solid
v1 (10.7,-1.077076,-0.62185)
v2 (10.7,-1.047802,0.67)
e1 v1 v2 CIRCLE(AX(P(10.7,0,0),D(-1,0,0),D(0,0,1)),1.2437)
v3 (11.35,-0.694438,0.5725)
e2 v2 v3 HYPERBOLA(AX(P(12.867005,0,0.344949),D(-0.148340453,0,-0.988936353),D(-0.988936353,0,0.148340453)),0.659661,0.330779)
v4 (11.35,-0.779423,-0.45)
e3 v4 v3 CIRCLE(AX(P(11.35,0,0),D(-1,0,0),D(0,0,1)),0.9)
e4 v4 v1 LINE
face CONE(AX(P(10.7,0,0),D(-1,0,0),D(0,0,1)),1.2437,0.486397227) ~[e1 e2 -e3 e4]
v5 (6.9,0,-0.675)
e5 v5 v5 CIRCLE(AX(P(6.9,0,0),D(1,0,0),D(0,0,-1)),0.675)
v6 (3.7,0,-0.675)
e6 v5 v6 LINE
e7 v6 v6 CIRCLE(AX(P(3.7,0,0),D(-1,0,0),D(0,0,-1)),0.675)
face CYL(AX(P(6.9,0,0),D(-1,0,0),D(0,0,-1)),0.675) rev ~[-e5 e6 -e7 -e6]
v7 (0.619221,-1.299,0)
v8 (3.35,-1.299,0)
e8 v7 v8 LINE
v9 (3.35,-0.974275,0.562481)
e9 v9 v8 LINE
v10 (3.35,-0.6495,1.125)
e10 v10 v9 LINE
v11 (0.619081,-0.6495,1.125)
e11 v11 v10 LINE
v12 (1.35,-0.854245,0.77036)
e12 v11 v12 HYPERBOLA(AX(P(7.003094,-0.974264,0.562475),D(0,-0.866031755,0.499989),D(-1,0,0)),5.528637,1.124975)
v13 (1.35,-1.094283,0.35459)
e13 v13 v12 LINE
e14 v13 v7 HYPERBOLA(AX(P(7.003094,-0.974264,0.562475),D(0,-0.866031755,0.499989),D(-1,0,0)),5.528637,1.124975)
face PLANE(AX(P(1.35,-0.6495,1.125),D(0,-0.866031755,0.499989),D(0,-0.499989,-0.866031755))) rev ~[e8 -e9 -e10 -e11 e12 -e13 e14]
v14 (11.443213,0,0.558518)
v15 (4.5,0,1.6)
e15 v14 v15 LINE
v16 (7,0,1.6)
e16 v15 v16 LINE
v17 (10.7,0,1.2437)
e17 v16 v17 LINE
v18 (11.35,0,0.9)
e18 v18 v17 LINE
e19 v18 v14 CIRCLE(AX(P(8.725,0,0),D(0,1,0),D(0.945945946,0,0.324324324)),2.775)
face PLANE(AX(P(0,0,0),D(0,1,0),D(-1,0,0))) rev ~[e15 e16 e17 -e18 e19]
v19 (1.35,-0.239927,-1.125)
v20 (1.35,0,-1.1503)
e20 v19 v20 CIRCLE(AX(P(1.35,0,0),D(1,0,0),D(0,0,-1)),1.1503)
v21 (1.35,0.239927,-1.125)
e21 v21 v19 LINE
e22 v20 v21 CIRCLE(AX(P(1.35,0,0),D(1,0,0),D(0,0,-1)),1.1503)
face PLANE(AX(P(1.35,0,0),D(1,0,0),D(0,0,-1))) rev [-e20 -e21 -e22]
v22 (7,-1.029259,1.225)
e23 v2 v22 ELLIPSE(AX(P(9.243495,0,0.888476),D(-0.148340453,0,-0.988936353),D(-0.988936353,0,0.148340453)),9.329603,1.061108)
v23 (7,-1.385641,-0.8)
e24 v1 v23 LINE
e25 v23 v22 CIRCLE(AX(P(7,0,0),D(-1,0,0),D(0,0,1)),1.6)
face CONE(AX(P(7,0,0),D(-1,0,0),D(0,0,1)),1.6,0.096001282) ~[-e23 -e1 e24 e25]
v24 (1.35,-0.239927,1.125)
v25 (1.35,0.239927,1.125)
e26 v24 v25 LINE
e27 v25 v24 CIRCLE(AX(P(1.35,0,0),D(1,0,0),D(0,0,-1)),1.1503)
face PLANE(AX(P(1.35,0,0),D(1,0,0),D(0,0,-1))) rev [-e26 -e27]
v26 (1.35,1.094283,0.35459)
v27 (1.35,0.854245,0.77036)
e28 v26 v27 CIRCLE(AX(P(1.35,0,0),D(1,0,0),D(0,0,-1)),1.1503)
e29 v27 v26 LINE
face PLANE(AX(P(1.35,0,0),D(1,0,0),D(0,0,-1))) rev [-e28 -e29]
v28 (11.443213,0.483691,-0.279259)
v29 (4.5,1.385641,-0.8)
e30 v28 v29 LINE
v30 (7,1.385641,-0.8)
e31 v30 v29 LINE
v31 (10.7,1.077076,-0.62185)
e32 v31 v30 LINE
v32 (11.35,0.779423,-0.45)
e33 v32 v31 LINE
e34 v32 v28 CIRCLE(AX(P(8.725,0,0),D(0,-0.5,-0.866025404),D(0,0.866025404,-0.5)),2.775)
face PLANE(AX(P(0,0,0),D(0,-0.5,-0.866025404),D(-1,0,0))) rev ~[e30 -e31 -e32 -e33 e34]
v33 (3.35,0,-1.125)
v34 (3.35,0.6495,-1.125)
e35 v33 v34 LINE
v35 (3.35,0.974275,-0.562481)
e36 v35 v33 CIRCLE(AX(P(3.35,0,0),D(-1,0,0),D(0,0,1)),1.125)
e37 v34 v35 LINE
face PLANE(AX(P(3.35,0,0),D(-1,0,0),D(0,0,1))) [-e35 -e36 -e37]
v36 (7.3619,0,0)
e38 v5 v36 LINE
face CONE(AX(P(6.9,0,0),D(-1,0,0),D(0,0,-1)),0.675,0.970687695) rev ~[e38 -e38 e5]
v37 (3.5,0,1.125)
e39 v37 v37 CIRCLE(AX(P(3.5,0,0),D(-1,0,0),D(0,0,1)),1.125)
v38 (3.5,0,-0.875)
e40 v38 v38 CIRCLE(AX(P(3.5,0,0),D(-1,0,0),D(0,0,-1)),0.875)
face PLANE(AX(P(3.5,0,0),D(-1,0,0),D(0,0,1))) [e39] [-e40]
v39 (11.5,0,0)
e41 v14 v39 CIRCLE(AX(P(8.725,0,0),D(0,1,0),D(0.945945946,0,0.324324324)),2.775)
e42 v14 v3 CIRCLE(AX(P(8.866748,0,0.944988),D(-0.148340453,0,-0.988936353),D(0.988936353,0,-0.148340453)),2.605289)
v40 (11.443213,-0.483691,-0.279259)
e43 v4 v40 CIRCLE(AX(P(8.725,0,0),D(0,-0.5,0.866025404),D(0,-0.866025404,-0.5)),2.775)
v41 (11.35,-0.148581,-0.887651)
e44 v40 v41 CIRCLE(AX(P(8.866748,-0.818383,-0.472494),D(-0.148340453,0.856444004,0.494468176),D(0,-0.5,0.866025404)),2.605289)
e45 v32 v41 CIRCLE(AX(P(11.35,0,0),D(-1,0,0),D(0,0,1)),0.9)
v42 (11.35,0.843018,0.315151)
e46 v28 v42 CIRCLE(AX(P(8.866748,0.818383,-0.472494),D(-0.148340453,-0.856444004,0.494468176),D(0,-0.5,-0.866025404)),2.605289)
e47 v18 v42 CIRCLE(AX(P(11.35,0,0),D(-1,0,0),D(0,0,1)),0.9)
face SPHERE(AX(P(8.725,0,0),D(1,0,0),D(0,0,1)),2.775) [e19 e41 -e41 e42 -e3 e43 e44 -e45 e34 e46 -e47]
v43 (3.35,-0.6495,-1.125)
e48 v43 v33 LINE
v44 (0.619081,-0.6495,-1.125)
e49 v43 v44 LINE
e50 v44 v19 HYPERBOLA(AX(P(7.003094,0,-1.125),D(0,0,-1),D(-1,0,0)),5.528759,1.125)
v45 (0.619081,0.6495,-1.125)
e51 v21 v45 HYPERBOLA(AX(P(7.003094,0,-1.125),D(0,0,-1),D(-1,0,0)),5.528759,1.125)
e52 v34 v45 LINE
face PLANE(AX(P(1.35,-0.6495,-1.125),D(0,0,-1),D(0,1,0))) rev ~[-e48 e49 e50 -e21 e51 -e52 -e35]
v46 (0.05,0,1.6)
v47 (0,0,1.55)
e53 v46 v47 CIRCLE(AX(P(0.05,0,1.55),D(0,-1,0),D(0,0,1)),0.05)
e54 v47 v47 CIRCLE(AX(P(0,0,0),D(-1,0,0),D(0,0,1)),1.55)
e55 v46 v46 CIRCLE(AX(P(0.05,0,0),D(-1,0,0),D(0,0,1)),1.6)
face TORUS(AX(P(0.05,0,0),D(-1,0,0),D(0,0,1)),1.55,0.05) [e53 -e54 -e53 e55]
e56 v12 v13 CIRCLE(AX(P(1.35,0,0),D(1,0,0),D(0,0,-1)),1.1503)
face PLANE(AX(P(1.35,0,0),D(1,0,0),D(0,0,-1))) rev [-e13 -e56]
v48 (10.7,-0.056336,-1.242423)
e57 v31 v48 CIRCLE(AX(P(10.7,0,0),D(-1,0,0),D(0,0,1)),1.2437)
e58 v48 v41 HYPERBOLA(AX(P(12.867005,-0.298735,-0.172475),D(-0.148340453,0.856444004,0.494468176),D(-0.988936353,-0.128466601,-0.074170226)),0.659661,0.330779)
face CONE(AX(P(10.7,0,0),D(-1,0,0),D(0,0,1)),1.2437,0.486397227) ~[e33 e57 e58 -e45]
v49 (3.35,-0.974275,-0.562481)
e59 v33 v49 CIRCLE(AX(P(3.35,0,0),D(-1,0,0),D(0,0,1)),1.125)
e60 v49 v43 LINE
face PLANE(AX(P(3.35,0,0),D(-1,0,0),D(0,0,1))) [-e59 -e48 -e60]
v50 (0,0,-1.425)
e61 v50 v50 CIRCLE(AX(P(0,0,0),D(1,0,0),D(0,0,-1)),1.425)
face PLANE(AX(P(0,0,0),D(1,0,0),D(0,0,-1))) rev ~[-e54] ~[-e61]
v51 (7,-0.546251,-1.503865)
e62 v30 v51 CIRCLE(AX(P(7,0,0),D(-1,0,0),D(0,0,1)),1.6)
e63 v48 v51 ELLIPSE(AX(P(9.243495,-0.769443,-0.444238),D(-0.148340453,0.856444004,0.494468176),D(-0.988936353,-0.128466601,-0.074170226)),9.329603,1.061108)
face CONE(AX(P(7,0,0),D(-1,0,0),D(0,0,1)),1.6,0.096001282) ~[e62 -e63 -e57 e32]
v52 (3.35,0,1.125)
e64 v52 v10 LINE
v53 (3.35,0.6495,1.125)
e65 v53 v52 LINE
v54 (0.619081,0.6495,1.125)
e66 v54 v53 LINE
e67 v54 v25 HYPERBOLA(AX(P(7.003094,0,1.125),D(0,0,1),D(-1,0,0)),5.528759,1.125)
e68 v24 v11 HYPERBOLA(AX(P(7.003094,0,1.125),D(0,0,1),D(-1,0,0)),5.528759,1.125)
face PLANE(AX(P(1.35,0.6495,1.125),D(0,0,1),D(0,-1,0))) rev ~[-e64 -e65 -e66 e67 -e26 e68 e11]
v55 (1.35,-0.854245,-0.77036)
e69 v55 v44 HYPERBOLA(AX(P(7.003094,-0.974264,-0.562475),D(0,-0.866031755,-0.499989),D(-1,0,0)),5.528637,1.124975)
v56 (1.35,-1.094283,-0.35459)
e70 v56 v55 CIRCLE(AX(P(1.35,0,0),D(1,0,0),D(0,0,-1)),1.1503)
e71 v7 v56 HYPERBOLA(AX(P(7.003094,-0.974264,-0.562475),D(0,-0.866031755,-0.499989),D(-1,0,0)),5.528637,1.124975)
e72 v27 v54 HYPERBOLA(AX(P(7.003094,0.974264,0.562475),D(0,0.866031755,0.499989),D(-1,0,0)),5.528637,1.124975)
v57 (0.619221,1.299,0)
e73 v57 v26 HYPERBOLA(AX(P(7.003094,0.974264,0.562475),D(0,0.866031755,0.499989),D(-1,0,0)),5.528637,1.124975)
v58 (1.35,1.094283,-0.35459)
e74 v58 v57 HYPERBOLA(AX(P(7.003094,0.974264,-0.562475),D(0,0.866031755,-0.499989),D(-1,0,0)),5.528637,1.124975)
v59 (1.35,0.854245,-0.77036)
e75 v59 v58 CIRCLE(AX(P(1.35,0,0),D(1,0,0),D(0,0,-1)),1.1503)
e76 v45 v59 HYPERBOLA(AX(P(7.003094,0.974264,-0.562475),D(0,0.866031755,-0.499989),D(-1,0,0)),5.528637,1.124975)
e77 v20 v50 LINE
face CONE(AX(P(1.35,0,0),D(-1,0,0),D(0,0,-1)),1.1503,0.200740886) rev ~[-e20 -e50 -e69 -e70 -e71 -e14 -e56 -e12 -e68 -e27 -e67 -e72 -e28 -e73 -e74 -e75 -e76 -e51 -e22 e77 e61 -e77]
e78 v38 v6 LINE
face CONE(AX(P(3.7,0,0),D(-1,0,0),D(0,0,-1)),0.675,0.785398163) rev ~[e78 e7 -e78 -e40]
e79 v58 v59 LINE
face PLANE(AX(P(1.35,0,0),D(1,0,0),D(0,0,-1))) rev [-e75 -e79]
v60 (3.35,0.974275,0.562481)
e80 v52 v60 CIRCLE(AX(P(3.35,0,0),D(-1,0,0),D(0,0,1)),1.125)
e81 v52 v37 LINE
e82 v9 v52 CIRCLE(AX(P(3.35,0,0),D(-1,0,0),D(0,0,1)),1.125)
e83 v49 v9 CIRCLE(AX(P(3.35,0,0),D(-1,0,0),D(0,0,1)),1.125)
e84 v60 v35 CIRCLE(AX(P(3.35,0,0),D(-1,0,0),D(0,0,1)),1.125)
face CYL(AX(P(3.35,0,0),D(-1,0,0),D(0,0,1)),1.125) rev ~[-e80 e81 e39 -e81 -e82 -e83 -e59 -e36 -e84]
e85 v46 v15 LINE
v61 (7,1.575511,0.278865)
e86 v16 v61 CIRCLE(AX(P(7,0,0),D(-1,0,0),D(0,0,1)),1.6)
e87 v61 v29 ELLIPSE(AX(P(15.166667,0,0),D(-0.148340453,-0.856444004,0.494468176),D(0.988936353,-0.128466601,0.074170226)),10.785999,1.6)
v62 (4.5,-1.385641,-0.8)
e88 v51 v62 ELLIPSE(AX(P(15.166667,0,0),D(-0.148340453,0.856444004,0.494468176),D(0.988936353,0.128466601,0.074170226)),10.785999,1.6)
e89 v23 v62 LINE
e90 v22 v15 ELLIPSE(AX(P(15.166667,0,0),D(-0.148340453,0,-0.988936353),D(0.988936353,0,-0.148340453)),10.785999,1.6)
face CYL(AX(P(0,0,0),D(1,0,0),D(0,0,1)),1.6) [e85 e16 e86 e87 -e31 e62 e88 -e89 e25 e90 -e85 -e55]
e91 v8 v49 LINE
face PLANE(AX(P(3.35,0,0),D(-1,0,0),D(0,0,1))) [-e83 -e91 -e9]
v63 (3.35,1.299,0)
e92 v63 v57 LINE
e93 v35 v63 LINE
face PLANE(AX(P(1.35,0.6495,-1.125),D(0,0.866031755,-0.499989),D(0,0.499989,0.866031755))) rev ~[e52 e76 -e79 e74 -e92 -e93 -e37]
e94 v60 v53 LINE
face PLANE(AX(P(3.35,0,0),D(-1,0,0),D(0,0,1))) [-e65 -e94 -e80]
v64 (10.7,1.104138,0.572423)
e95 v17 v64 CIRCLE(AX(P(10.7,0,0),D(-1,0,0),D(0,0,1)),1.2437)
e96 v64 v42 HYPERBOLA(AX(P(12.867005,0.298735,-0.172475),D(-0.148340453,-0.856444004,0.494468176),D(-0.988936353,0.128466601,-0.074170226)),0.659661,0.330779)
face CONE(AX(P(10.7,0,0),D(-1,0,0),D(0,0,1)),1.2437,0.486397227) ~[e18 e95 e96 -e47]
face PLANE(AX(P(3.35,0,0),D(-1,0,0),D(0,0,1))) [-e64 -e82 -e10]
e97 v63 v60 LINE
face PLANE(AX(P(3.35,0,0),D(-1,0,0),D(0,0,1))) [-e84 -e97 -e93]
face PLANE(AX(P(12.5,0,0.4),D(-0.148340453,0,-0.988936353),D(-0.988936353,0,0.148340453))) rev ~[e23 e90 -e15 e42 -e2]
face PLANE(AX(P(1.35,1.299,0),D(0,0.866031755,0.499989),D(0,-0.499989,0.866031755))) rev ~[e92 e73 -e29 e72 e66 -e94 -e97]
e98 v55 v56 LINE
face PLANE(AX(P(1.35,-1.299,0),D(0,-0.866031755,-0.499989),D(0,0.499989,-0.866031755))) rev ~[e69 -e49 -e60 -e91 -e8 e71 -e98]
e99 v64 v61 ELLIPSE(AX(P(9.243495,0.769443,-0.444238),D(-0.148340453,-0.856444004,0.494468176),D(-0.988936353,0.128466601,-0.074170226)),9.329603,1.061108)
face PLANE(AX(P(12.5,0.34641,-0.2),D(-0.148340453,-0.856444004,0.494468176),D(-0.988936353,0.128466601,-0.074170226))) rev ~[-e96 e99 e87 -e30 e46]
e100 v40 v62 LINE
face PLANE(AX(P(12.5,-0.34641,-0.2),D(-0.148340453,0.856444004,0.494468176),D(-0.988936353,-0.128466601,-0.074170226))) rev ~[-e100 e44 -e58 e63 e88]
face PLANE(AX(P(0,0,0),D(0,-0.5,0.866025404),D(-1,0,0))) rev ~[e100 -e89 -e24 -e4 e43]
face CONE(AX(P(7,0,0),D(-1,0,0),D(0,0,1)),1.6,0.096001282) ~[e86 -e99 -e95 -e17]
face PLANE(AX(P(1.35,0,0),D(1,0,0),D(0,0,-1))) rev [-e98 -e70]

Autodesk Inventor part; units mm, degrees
ref_plane "YZ Plane" through (0, 0, 0) normal (1, 0, 0) x (0, 1, 0)
ref_plane "XZ Plane" through (0, 0, 0) normal (0, 1, 0) x (-1, 0, 0)
ref_plane "XY Plane" through (0, 0, 0) normal (0, 0, 1) x (1, 0, 0)
sketch "Sketch1" plane through (0, 0, 0) normal (0, 1, 0) x (-1, 0, 0)
  line L0 (0, 0) -> (0, 1.6)
  line L1 (0, 1.6) -> (-7, 1.6)
  line L2 (-7, 1.6) -> (-10.7, 1.2437)
  line L3 (-11.2, 0.9793) -> (-11.2, 0)
  line L4 (-11.2, 0) -> (0, 0)
  arc A0 (-11.35, 0.9) -> (-11.5, 0) centre (-8.725, 0) ccw
  line L5 (-11.2, 0) -> (-11.5, 0)
  line L6 (-10.7, 0) -> (-10.7, 1.2437)
  line L7 (-10.7, 1.2437) -> (-11.35, 0.9)
  dimension "d0" = 1.6
  dimension "d1" = 7
  dimension "d3" = 11.2
  dimension "d4" = 0.3
  dimension "d352" = 0.8
  dimension "d353" = 0.9
  dimension "d355" = 0.65
  dimension "d359" = 5.5
revolve "Revolution1" add sketch "Sketch1" angle 360 about axis through (11.2, 0, 0) along (-1, 0, 0)
sketch "Sketch2" plane through (0, 0, 0) normal (0, 1, 0) x (-1, 0, 0)
  line L0 (0, -1.425) -> (0, 0)
  line L1 (0, 0) -> (-6.9, 0)
  line L2 (-6.9, 0) -> (-6.9, -0.675)
  line L3 (-6.9, -0.675) -> (-2.8, -0.675)
  line L4 (-2.8, -0.675) -> (-2.8, -1.1)
  line L5 (-2.8, -1.1) -> (-1.35, -1.1)
  line L6 (-1.35, -1.1) -> (-1.35, -1.1503)
  line L7 (-1.35, -1.1503) -> (0, -1.425)
  line L8 (-6.9, -0.675) -> (-7.3619, 0)
  line L9 (-7.3619, 0) -> (-6.9, 0) construction
  line L10 (-7.3619, 0) -> (-6.9, 0)
  line L11 (0, 0) -> (0, -1.425)
  line L12 (0, -1.6) -> (0, 1.6) projected
  line L13 (0, -1.425) -> (0, -1.425)
  dimension "d9" = 1.1
  dimension "d11" = 1.425
  dimension "d12" = 11.5
  dimension "d145" = 0.4619
  dimension "d284" = 1.45
  dimension "d293" = 1.35
  dimension "d361" = 1.425
  dimension "d363" = 0
  dimension "d367" = 6.9
  dimension "d373" = 0.675
revolve "Revolution2" cut sketch "Sketch2" angle 360 about axis through (0, 0, 0) along (1, 0, 0)
sketch "Sketch3" plane through (1.35, 0, 0) normal (-1, 0, 0) x (0, 0, 1)
  line L0 (0, 1.299) -> (1.125, 0.6495)
  line L1 (1.125, 0.6495) -> (1.125, -0.6495)
  line L2 (1.125, -0.6495) -> (0, -1.299)
  line L3 (0, -1.299) -> (-1.125, -0.6495)
  line L4 (-1.125, -0.6495) -> (-1.125, 0.6495)
  line L5 (-1.125, 0.6495) -> (0, 1.299)
  point P0 (0, 0)
  point P1 (0, 0)
  dimension "d20" = 0
  dimension "d21" = 2.25
extrude "Extrusion1" cut sketch "Sketch3" along normal blind 1.25 and the other way blind 2
fillet "Fillet1" radius 0.05 1 edges at (0, 0, -1.6)
sketch "Sketch10" plane through (0, 0, 0) normal (0, 1, 0) x (-1, 0, 0)
  circle A0 centre (-1.8, 1.5) radius 0.1
  line L0 (-0.5216, -1.4433) -> (-0.46, -1.55)
  line L1 (-0.46, -1.55) -> (-0.6332, -1.55)
  line L2 (-0.6332, -1.55) -> (-0.5716, -1.4433)
  line L3 (-0.5216, -1.4433) -> (-0.5716, -1.4433)
  line L4 (0, 1.55) -> (0, -1.55) projected
  point P0 (0, 0)
  point P1 (-0.5466, -1.5)
  point P2 (-0.5466, -1.4)
  dimension "d69" = 0.2
  dimension "d70" = 1.5
  dimension "d71" = 1.8
  dimension "d232" = 0.15
  dimension "d233" = 0.05
  dimension "d234" = 0.05
  dimension "d235" = 0.46
  dimension "d236" = 1.55
  dimension "d237" = 1.55
sketch "Sketch24" plane through (0, 0, 0) normal (0, 1, 0) x (-1, 0, 0)
  line L0 (-2.0692, 1.4443) -> (-2.5292, 1.4)
  line L1 (-2.5292, 1.4) -> (-3.1116, 2.2165)
  line L2 (-3.1116, 2.2165) -> (-2, 2.3235)
  line L3 (-2, 2.3235) -> (-2.0692, 1.4443)
  line L4 (-0.6191, 1.125) -> (-3.35, 1.125) projected
  line L5 (0, 1.425) -> (0, -1.425) projected
  point P0 (0, 0)
  point P1 (-2.6, -1.125)
  point P2 (-0.2505, -1.125)
  dimension "d167" = 60
  dimension "d170" = 2
  dimension "d171" = 100
  dimension "d357" = 0.8685
  dimension "d358" = 0.46
  dimension "d370" = 1.4
  dimension "d371" = 84.5
coil "Coil12" [suppressed]
coil "Coil16" [suppressed]
sketch "Sketch41" plane through (2.0889, 1.4266, -0.4635) normal (0, -0.309017, -0.9510565) x (1, 0, 0)
  line L0 (0.1155, 0) -> (0.0827, 0.0567) projected
  line L1 (0.0827, 0.0567) -> (0.0327, 0.0567) projected
  line L2 (-0.4173, 0.0567) -> (-0.4673, 0.0567) projected
  line L3 (-0.9173, 0.0567) -> (-0.9673, 0.0567) projected
  line L4 (-1.4173, 0.0567) -> (-1.4673, 0.0567) projected
  line L5 (-1.2173, 2.9433) -> (-1.1673, 2.9433) projected
  line L6 (-0.7173, 2.9433) -> (-0.6673, 2.9433) projected
  line L7 (-0.2173, 2.9433) -> (-0.1673, 2.9433) projected
  arc A0 (-2.0889, 0.05) -> (-2.0389, 0) centre (-2.0389, 0.05) ccw projected
  line L8 (-2.0889, 0.05) -> (-2.0889, 0.15) projected
  line L9 (-2.0889, 0.15) -> (-1.1065, 0.3499) projected
  line L10 (4.8111, 0.7) -> (5.273, 1.5) projected
  line L11 (5.273, 1.5) -> (4.8111, 2.3) projected
  line L12 (-1.1065, 2.6501) -> (-2.0889, 2.85) projected
  line L13 (-2.0889, 2.85) -> (-2.0889, 2.95) projected
  arc A1 (-2.0389, 3) -> (-2.0889, 2.95) centre (-2.0389, 2.95) ccw projected
  line L14 (4.8111, 2.3) -> (0.7111, 2.3) projected
  line L15 (0.7111, 0.7) -> (4.8111, 0.7) projected
  line L16 (0.7111, 2.3) -> (0.7111, 2.6) projected
  line L17 (0.5111, 0.4) -> (0.7111, 0.4) projected
  line L18 (0.7111, 2.6) -> (0.5111, 2.6) projected
  line L19 (0.7111, 0.4) -> (0.7111, 0.7) projected
  line L20 (0, 0) -> (-0.3845, 0) projected
  line L21 (0.0327, 0.0567) -> (0, 0) projected
  line L22 (0.1155, 0) -> (0, 0) projected
  line L23 (0.5111, 0.3499) -> (0.5111, 0.4) projected
  line L24 (0.5111, 2.6) -> (0.5111, 2.6501) projected
  arc A2 (9.2611, 0.6) -> (9.2611, 2.4) centre (6.6361, 1.5) ccw projected
  line L25 (0.5111, 2.6501) -> (-1.1065, 2.6501) projected
  line L26 (4.9111, 0) -> (0.1155, 0) projected
  line L27 (-1.1065, 0.3499) -> (0.5111, 0.3499) projected
  line L28 (9.2611, 0.6) -> (8.6111, 0.3237) projected
  line L29 (8.6111, 0.3237) -> (4.9111, 0) projected
  line L30 (-0.5, 0) -> (-0.8845, 0) projected
  line L31 (-1, 0) -> (-1.3845, 0) projected
  line L32 (-1.5, 0) -> (-2.0389, 0) projected
  line L33 (-2.0389, 3) -> (-1.25, 3) projected
  line L34 (-1.1345, 3) -> (-0.75, 3) projected
  line L35 (-0.6345, 3) -> (-0.25, 3) projected
  line L36 (-0.1345, 3) -> (4.9111, 3) projected
  line L37 (4.9111, 3) -> (8.6111, 2.6763) projected
  line L38 (8.6111, 2.6763) -> (9.2611, 2.4) projected
  point P0 (-2.0889, 1.5)
  point P1 (0.04, 2.55)
  point P2 (0.04, 0.95)
  point P3 (2.4363, -2.336)
  point P4 (2.2646, -2.336)
  point P5 (1.6424, -2.336)
  point P6 (1.4156, -2.336)
  point P7 (0.8485, -2.336)
  point P8 (0.5666, -2.336)
  point P9 (0.14, 0.3317)
  point P10 (0.14, 2.6683)
  point P11 (-0.69, 0)
  point P12 (-0.5168, 0)
  point P13 (-1.15, 0)
  point P14 (0.0554, 3.4951)
  point P15 (0.4369, 3.5)
  point P16 (5.5075, 3.4591)
  point P17 (9.4087, 0.8232)
  point P18 (9.1185, 0.3568)
  point P19 (9.1075, 0.3559)
  point P20 (8.3185, 0.2868)
  point P21 (8.3075, 0.2859)
  point P22 (7.5185, 0.2168)
  point P23 (7.5075, 0.2159)
  point P24 (6.7185, 0.1469)
  point P25 (6.7075, 0.1459)
  point P26 (5.9185, 0.0769)
  point P27 (5.9075, 0.0759)
  point P28 (5.1185, 0.0069)
  point P29 (5.1075, 0.0059)
  point P30 (0, 0.0001)
  point P31 (10.24, 3.1065)
  point P32 (9.9229, 0.3686)
  point P33 (9.8272, 0.361)
  point P34 (9.1222, 0.3055)
  point P35 (9.0317, 0.2984)
  point P36 (8.3215, 0.2425)
  point P37 (8.2362, 0.2358)
  point P38 (7.5207, 0.1795)
  point P39 (7.4407, 0.1732)
  point P40 (6.72, 0.1165)
  point P41 (6.6452, 0.1106)
  point P42 (5.9192, 0.0535)
  point P43 (5.8497, 0.048)
  point P44 (5.1195, 0)
  point P45 (5.0443, 0)
  point P46 (4.2066, 0)
  point P47 (3.5312, 0)
  point P48 (3.3689, 0)
  point P49 (2.7371, 0)
  point P50 (2.5311, 0)
  point P51 (1.943, 0)
  point P52 (1.6934, 0)
  point P53 (1.1489, 0)
  point P54 (0.8557, 0)
  point P55 (10.3292, 3.0438)
  point P56 (10.225, 3.1077)
  point P57 (9.5226, 3.163)
  point P58 (9.4295, 3.1703)
  point P59 (8.7218, 3.226)
  point P60 (8.634, 3.2329)
  point P61 (7.9211, 3.289)
  point P62 (7.8385, 3.2955)
  point P63 (7.1203, 3.352)
  point P64 (7.043, 3.3581)
  point P65 (6.3196, 3.415)
  point P66 (6.2475, 3.4207)
  point P67 (5.5189, 3.4781)
  point P68 (5.4519, 3.4833)
  point P69 (4.7224, 3.5)
  point P70 (4.6255, 3.5)
  point P71 (3.9283, 3.5)
  point P72 (3.7877, 3.5)
  point P73 (3.1342, 3.5)
  point P74 (2.95, 3.5)
  point P75 (2.3401, 3.5)
  point P76 (2.1123, 3.5)
  point P77 (1.5459, 3.5)
  point P78 (1.2745, 3.5)
  point P79 (0.7518, 3.5)
  point P80 (0.4368, 3.5)
  point P81 (0.0559, 3.4961)
  point P82 (-0.0003, 0)
  point P83 (1.2685, 3)
  point P84 (0.6925, 3)
  point P85 (2.1062, 3)
  point P86 (2.9439, 3)
  point P87 (1.4866, 3)
  point P88 (3.7817, 3)
  point P89 (2.2807, 3)
  point P90 (3.0748, 3)
  point P91 (4.6194, 3)
  point P92 (3.8689, 3)
  point P93 (4.6631, 3)
  point P94 (9.3294, 0.7244)
  point P95 (8.9446, 0.4186)
  point P96 (5.4339, 2.9655)
  point P97 (5.461, 2.9636)
  point P98 (6.2339, 2.9095)
  point P99 (6.261, 2.9076)
  point P100 (7.0339, 2.8536)
  point P101 (7.061, 2.8517)
  point P102 (7.8339, 2.7976)
  point P103 (7.861, 2.7957)
  point P104 (8.6339, 2.7417)
  point P105 (8.261, 0.2322)
  point P106 (7.461, 0.1763)
  point P107 (8.2339, 0.2303)
  point P108 (6.661, 0.1203)
  point P109 (7.4339, 0.1744)
  point P110 (5.861, 0.0644)
  point P111 (6.6339, 0.1184)
  point P112 (5.061, 0.0085)
  point P113 (5.8339, 0.0625)
  point P114 (9.0823, 0.491)
  point P115 (-0.7468, 0)
  point P116 (5.0339, 0.0066)
  point P117 (-1.2068, 0)
  point P118 (0.1351, 3)
  point P119 (0.9307, 3)
  point P120 (0.6796, 3)
  point P121 (1.5195, 3)
  point P122 (1.7263, 3)
  point P123 (2.3594, 3)
  point P124 (2.5219, 3)
  point P125 (3.1993, 3)
  point P126 (3.3175, 3)
  point P127 (4.0392, 3)
  point P128 (4.113, 3)
  point P129 (5.6716, 2.9335)
  point P130 (5.7097, 2.9301)
  point P131 (6.4622, 2.8643)
  point P132 (6.5109, 2.86)
  point P133 (7.2527, 2.7951)
  point P134 (7.312, 2.79)
  point P135 (8.0433, 2.726)
  point P136 (8.1131, 2.7199)
  point P137 (8.7927, 2.5991)
  point P138 (8.9225, 2.5439)
  point P139 (9.115, 0.5379)
  point P140 (8.5136, 0.3152)
  point P141 (8.4386, 0.3086)
  point P142 (7.7125, 0.2451)
  point P143 (7.648, 0.2394)
  point P144 (6.9114, 0.175)
  point P145 (6.8574, 0.1703)
  point P146 (6.1103, 0.1049)
  point P147 (6.0669, 0.1011)
  point P148 (5.3092, 0.0348)
  point P149 (5.2763, 0.0319)
  point P150 (4.9086, 3)
  point P151 (4.8791, 3)
extrude "Extrusion19" [suppressed]
sketch "Sketch45" plane through (0, 0, 0) normal (0, 1, 0) x (-1, 0, 0)
  point P0 (0, 0)
sketch "Sketch47" plane through (0, 0, 0) normal (0, 0, 1) x (1, 0, 0)
  line L0 (0, -1.425) -> (0.6191, -1.299) projected
  line L1 (6.9, -0.675) -> (7.3619, 0) projected
  line L2 (7.3619, 0) -> (6.9, 0.675) projected
  line L3 (0.6191, 1.299) -> (0, 1.425) projected
  line L4 (6.9, 0.675) -> (3.35, 0.675) projected
  line L5 (3.35, -0.675) -> (6.9, -0.675) projected
  arc A0 (0, -1.55) -> (0.05, -1.6) centre (0.05, -1.55) ccw projected
  line L6 (0, -1.55) -> (0, -1.425) projected
  line L7 (0, 1.425) -> (0, 1.55) projected
  arc A1 (0.05, 1.6) -> (0, 1.55) centre (0.05, 1.55) ccw projected
  line L8 (10.7, 1.2437) -> (11.35, 0.9) projected
  arc A2 (11.35, -0.9) -> (11.35, 0.9) centre (8.725, 0) ccw projected
  line L9 (11.35, -0.9) -> (10.7, -1.2437) projected
  line L10 (10.7, -1.2437) -> (7, -1.6) projected
  line L11 (7, -1.6) -> (0.05, -1.6) projected
  line L12 (0.05, 1.6) -> (7, 1.6) projected
  line L13 (7, 1.6) -> (10.7, 1.2437) projected
  line L14 (0.6191, -1.299) -> (3.35, -1.299) projected
  line L15 (3.35, -1.299) -> (3.35, -0.675) projected
  line L16 (3.35, 0.675) -> (3.35, 1.299) projected
  line L17 (3.35, 1.299) -> (0.6191, 1.299) projected
  point P0 (0, 0)
  point P1 (7.012, 0)
sketch "Sketch9" plane through (0, 0, 0) normal (0, 1, 0) x (-1, 0, 0)
  line L0 (0, 1.425) -> (0, -1.425) projected
  line L1 (0, -1.6) -> (0, 1.6) projected
  line L2 (-12.5, 1.6) -> (-4.5, 1.6)
  line L3 (-7, 1.6) -> (0, 1.6) projected
  line L4 (-12.5, 1.6) -> (-12.5, 0.4)
  line L5 (-12.5, 0.4) -> (-4.5, 1.6)
  point P0 (0, 0)
  dimension "d257" = 1.2
  dimension "d258" = 4.5
  dimension "d262" = 8
extrude "Extrusion4" cut sketch "Sketch9" against normal blind 2
pattern_circular "Circular Pattern1" count 3 over 360 about axis through (-10, 0, 0) along (1, 0, 0) of "Extrusion4"
sketch "Sketch50" plane through (0, 0, 0) normal (0, 1, 0) x (-1, 0, 0)
  line L0 (-3.35, 0.675) -> (-6.9, 0.675) projected
  line L1 (-6.9, 0.675) -> (-7.3619, 0) projected
  line L2 (-6.9, -0.675) -> (-3.35, -0.675) projected
  arc A0 (-0.05, -1.6) -> (0, -1.55) centre (-0.05, -1.55) ccw projected
  arc A1 (0, 1.55) -> (-0.05, 1.6) centre (-0.05, 1.55) ccw projected
  line L3 (-0.05, -1.6) -> (-7, -1.6) projected
  line L4 (-1.35, -1.1503) -> (0, -1.425) projected
  line L5 (0, -1.425) -> (0, -1.55) projected
  line L6 (0, 1.55) -> (0, 1.425) projected
  line L7 (0, 1.425) -> (-1.35, 1.1503) projected
  line L8 (-7.3619, 0) -> (-6.9, -0.675) projected
  line L9 (-4.5, 1.6) -> (-0.05, 1.6) projected
  line L10 (-11.4432, 0.5585) -> (-4.5, 1.6) projected
  line L11 (-7, -1.6) -> (-10.7, -1.2437) projected
  line L12 (-10.7, -1.2437) -> (-11.35, -0.9) projected
  arc A2 (-11.4432, 0.5585) -> (-11.35, -0.9) centre (-8.725, 0) ccw projected
  arc A3 (-11.35, 0.9) -> (-11.4432, 0.5585) centre (-8.725, 0) ccw projected
  line L13 (-11.35, 0.9) -> (-10.7, 1.2437) projected
  line L14 (-10.7, 1.2437) -> (-7, 1.6) projected
  line L15 (-7, 1.6) -> (-4.5, 1.6) projected
  line L16 (-3.35, 1.125) -> (-3.35, 0.675) projected
  line L17 (-3.35, -0.675) -> (-3.35, -1.125) projected
  line L18 (-3.35, -1.125) -> (-1.35, -1.125) projected
  line L19 (-1.35, -1.125) -> (-1.35, -1.1503) projected
  line L20 (-1.35, 1.1503) -> (-1.35, 1.125) projected
  line L21 (-1.35, 1.125) -> (-3.35, 1.125) projected
  point P0 (0, 0)
  point P1 (-1.4382, 1.75)
  point P2 (-1.495, 1.75)
  point P3 (-1.6682, 1.75)
  point P4 (-6.2041, 1.75)
  point P5 (-11.5804, 0.9405)
  point P6 (-2.2986, 1.75)
  point P7 (-5.8766, -1.75)
  point P8 (-6.6717, -1.75)
  point P9 (-7.4687, -1.7289)
  point P10 (-10.5666, -1.2193)
  point P11 (-10.7, -0.8888)
  point P12 (-3.5, -1.3923)
  point P13 (-4.3, -1.3364)
  point P14 (-5.1, -1.2804)
  point P15 (-5.9, -1.2245)
  point P16 (-6.7, -1.1685)
  point P17 (-7.5, -1.1126)
  point P18 (-2.3, 1.4762)
  point P19 (-3.1, 1.4203)
  point P20 (-3.9, 1.3643)
  point P21 (-4.7, 1.3084)
  point P22 (-5.5, 1.2524)
  point P23 (-6.3, 1.1965)
  point P24 (-7.1, 1.1406)
  point P25 (-7.9, 1.0846)
  point P26 (-8.7, 1.0287)
  point P27 (-6.2532, 1.5)
  point P28 (-3.5, -1.3923)
  point P29 (-7.4513, -1.4231)
  point P30 (-8.2513, -1.3601)
  point P31 (-9.0513, -1.2971)
  point P32 (-8.3929, 1.3781)
sketch "Sketch51" plane through (0, 0, 0) normal (0, 0, 1) x (1, 0, 0)
  line L0 (0, -1.425) -> (0.6191, -1.299) projected
  line L1 (6.9, -0.675) -> (7.3619, 0) projected
  line L2 (7.3619, 0) -> (6.9, 0.675) projected
  line L3 (0.6191, 1.299) -> (0, 1.425) projected
  line L4 (0.05, 1.6) -> (5.9291, 1.6) projected
  line L5 (0, 1.425) -> (0, 1.55) projected
  arc A0 (0.05, 1.6) -> (0, 1.55) centre (0.05, 1.55) ccw projected
  arc A1 (0, -1.55) -> (0.05, -1.6) centre (0.05, -1.55) ccw projected
  line L6 (0, -1.55) -> (0, -1.425) projected
  line L7 (5.9291, 1.6) -> (11.4232, 0.6484) projected
  line L8 (7, -1.6) -> (0.05, -1.6) projected
  arc A2 (11.35, -0.9) -> (11.4232, 0.6484) centre (8.725, 0) ccw projected
  line L9 (11.35, -0.9) -> (10.7, -1.2437) projected
  line L10 (10.7, -1.2437) -> (7, -1.6) projected
  line L11 (3.35, 1.299) -> (0.6191, 1.299) projected
  line L12 (0.6191, -1.299) -> (3.35, -1.299) projected
  line L13 (3.35, -1.299) -> (3.35, -0.675) projected
  line L14 (3.35, -0.675) -> (6.9, -0.675) projected
  line L15 (6.9, 0.675) -> (3.35, 0.675) projected
  line L16 (3.35, 0.675) -> (3.35, 1.299) projected
  point P0 (0, 0)
  point P1 (7.012, 0)
  point P2 (0.7475, 1.75)
  point P3 (0.9775, 1.75)
  point P4 (1.2075, 1.75)
  point P5 (8.1591, 1.2076)
  point P6 (5.2803, 1.75)
  point P7 (6.0754, 1.75)
  point P8 (7.6761, 1.6296)
  point P9 (8.4815, 1.5119)
  point P10 (6.0591, 1.5)
  point P11 (10.1597, -0.9266)
  point P12 (9.6652, -1.2902)
  point P13 (8.8644, -1.3533)
  point P14 (7.2629, -1.4793)
  point P15 (9.3597, -0.9825)
  point P16 (3.3597, 1.4021)
  point P17 (4.1597, 1.3462)
  point P18 (6.5597, 1.1783)
  point P19 (7.3597, 1.1224)
  point P20 (8.1597, 1.0665)
  point P21 (9.7597, 0.9546)
  point P22 (10.5597, 0.8986)
  point P23 (10.9597, -0.8707)
  point P24 (8.5597, -1.0385)
  point P25 (7.7597, -1.0944)
  point P26 (6.9597, -1.1504)
  point P27 (5.3597, -1.2622)
  point P28 (4.5597, -1.3182)
  point P29 (3.7597, -1.3741)
  point P30 (2.9597, -1.4301)
  point P31 (3.3597, 1.4021)
  point P32 (9.6652, -1.2902)
  point P33 (10.5597, 0.8986)
  point P34 (8.9597, 0.8491)
  point P35 (10.5597, 0.7232)
  point P36 (6.5597, 1.038)
  point P37 (2.8826, 1.5)
  point P38 (3.6767, 1.5)
  point P39 (4.4708, 1.5)
  point P40 (5.2498, -1.5)
  point P41 (4.0738, -1.5)
  point P42 (3.2796, -1.5)
sketch "Sketch52" plane through (3.35, 0, 0) normal (-1, 0, 0) x (0, 0, 1)
  circle A0 centre (0, 0) radius 1.125
  point P0 (0, 0)
  dimension "d321" = 2.25
extrude "Extrusion21" cut sketch "Sketch52" against normal blind 0.15
sketch "Sketch53" plane through (0, 0, 0) normal (0, 0, 1) x (1, 0, 0)
  line L0 (2.8, -0.75) -> (3.0165, -0.75)
  line L1 (2.8, -0.75) -> (2.8, -1.125)
  line L2 (2.8, -1.125) -> (3.0165, -0.75)
  line L3 (-2.3285, 0) -> (13.8985, 0) projected
  point P0 (0, 0)
  dimension "d325" = 1.125
  dimension "d326" = 0.75
  dimension "d327" = 60
  dimension "d328" = 2.8
revolve "Revolution7" [suppressed]
thread "Thread3" size "M1.6x0.35" class "6H" standard "ANSI Metric M Profile" length 3.1
sketch "Sketch54" plane through (0, 0, 0) normal (0, 1, 0) x (-1, 0, 0)
  line L0 (-13, 1.19) -> (-13, 0.25)
  line L1 (2.6124, 0) -> (-15.6021, 0) projected
  line L2 (0, 1.425) -> (0, -1.425) projected
  line L3 (-13, 0.25) -> (-12.6579, 1.19)
  line L4 (-12.6579, 1.19) -> (-13, 1.19)
  point P0 (0, 0)
  point P1 (-12.861, 0.9532)
  dimension "d341" = 13
  dimension "d342" = 0.94
  dimension "d343" = 20
  dimension "d344" = 0.25
revolve "Revolution8" cut sketch "Sketch54" angle 360 about axis through (-10, 0, 0) along (1, 0, 0)
sketch "Sketch55" plane through (0.5216, 0, -1.4433) normal (0, 1, 0) x (1, 0, 0)
  line L0 (0.05, 0) -> (0.0827, 0.0567) projected
  line L1 (-0.0327, 0.0567) -> (0.0827, 0.0567) projected
  line L2 (-0.4716, 0.0567) -> (-0.0327, 0.0567) projected
  arc A0 (-0.4716, 0.0567) -> (-0.5216, 0.0067) centre (-0.4716, 0.0067) ccw projected
  line L3 (-0.5216, -0.0933) -> (-0.5216, 0.0067) projected
  line L4 (0.5843, -0.3183) -> (-0.5216, -0.0933) projected
  line L5 (6.3784, -0.6433) -> (2.2784, -0.6433) projected
  line L6 (6.8403, -1.4433) -> (6.3784, -0.6433) projected
  line L7 (6.3784, -2.2433) -> (6.8403, -1.4433) projected
  line L8 (2.2784, -2.2433) -> (6.3784, -2.2433) projected
  line L9 (-0.5216, -2.7933) -> (0.5843, -2.5683) projected
  line L10 (-0.5216, -2.8933) -> (-0.5216, -2.7933) projected
  arc A1 (-0.5216, -2.8933) -> (-0.4716, -2.9433) centre (-0.4716, -2.8933) ccw projected
  line L11 (0.5, 0) -> (0.55, 0) projected
  line L12 (1, 0) -> (1.05, 0) projected
  line L13 (1.5, 0) -> (1.55, 0) projected
  line L14 (1.3, -2.8866) -> (1.25, -2.8866) projected
  line L15 (0.8, -2.8866) -> (0.75, -2.8866) projected
  line L16 (0.3, -2.8866) -> (0.25, -2.8866) projected
  line L17 (0, 0) -> (0.05, 0) projected
  line L18 (-0.0327, 0.0567) -> (0, 0) projected
  line L19 (0.0827, 0.0567) -> (0.4673, 0.0567) projected
  line L20 (10.9407, -1.899) -> (3.9784, -2.9433) projected
  line L21 (0.5827, 0.0567) -> (0.9673, 0.0567) projected
  line L22 (1.0827, 0.0567) -> (1.4673, 0.0567) projected
  line L23 (1.5827, 0.0567) -> (6.4784, 0.0567) projected
  line L24 (0.2173, -2.9433) -> (-0.4716, -2.9433) projected
  line L25 (2.2784, -0.6433) -> (2.2784, -0.3433) projected
  line L26 (2.2784, -0.3433) -> (2.0784, -0.3433) projected
  line L27 (2.0784, -0.3433) -> (2.0784, -0.3183) projected
  line L28 (2.0784, -0.3183) -> (0.5843, -0.3183) projected
  line L29 (0.5843, -2.5683) -> (2.0784, -2.5683) projected
  line L30 (2.0784, -2.5683) -> (2.0784, -2.5433) projected
  line L31 (2.0784, -2.5433) -> (2.2784, -2.5433) projected
  line L32 (2.2784, -2.5433) -> (2.2784, -2.2433) projected
  line L33 (3.9784, -2.9433) -> (1.3327, -2.9433) projected
  line L34 (1.2173, -2.9433) -> (0.8327, -2.9433) projected
  line L35 (0.7173, -2.9433) -> (0.3327, -2.9433) projected
  line L36 (6.4784, 0.0567) -> (10.0076, -0.2521) projected
  line L37 (10.0076, -0.2521) -> (10.4686, -0.3904) projected
  line L38 (10.4686, -0.3904) -> (10.8284, -0.5433) projected
  arc A2 (10.9407, -1.899) -> (10.8284, -0.5433) centre (8.2034, -1.4433) ccw projected
  arc A3 (10.8284, -2.3433) -> (10.9407, -1.899) centre (8.2034, -1.4433) ccw projected
  line L39 (10.8284, -2.3433) -> (10.1784, -2.6196) projected
  line L40 (10.1784, -2.6196) -> (6.4784, -2.9433) projected
  line L41 (6.4784, -2.9433) -> (3.9784, -2.9433) projected
  point P0 (-0.5216, -1.4433)
  point P1 (0.2266, -3.3933)
  point P2 (0.4566, -3.3933)
  point P3 (0.6866, -3.3933)
  point P4 (0.9166, -3.3933)
  point P5 (1.1466, -3.3933)
  point P6 (1.3766, -3.3933)
  point P7 (5.6825, -3.3933)
  point P8 (0.3416, 0.1067)
  point P9 (0.5716, 0.1067)
  point P10 (11.0588, -2.5838)
  point P11 (1.6066, -3.3933)
  point P12 (6.4725, -3.3933)
  point P13 (5.7316, -2.8933)
  point P14 (8.1784, -2.422)
  point P15 (10.6381, -0.5366)
  point P16 (2.9784, -0.001)
  point P17 (9.3784, -0.6222)
  point P18 (7.7297, -0.0332)
  point P19 (8.5297, -0.0962)
  point P20 (7.8713, -2.7714)
  point P21 (6.2784, -2.8933)
extrude "Extrusion22" [suppressed]
sketch "Sketch56" plane through (2.0454, -0.6215, 0.2019) normal (0, -0.309017, -0.9510565) x (1, 0, 0)
  line L0 (-1.1738, 0.7898) -> (-1.1238, 0.7898) projected
  arc A0 (-1.9954, 0.8465) -> (-2.0454, 0.7965) centre (-1.9954, 0.7965) ccw projected
  line L1 (-2.0454, 0.6965) -> (-2.0454, 0.7965) projected
  line L2 (-1.063, 0.4967) -> (-2.0454, 0.6965) projected
  line L3 (4.8546, -1.4535) -> (5.3165, -0.6535) projected
  line L4 (5.3165, -0.6535) -> (4.8546, 0.1465) projected
  line L5 (-2.0454, -2.0035) -> (-1.063, -1.8036) projected
  line L6 (-2.0454, -2.1035) -> (-2.0454, -2.0035) projected
  arc A1 (-2.0454, -2.1035) -> (-1.9954, -2.1535) centre (-1.9954, -2.1035) ccw projected
  line L7 (-0.6738, 0.7898) -> (-0.6238, 0.7898) projected
  line L8 (-0.1738, 0.7898) -> (-0.1238, 0.7898) projected
  line L9 (-0.3738, -2.0968) -> (-0.4238, -2.0968) projected
  line L10 (-0.8738, -2.0968) -> (-0.9238, -2.0968) projected
  line L11 (-1.3738, -2.0968) -> (-1.4238, -2.0968) projected
  line L12 (0.159, -2.1535) -> (0.1262, -2.0968) projected
  line L13 (0.1262, -2.0968) -> (0.0762, -2.0968) projected
  line L14 (-0.091, 0.8465) -> (0.1785, 0.8465) projected
  line L15 (0.0435, -2.1535) -> (-0.341, -2.1535) projected
  line L16 (0.0762, -2.0968) -> (0.0435, -2.1535) projected
  line L17 (0.159, -2.1535) -> (0.0435, -2.1535) projected
  line L18 (0.5763, -2.1535) -> (0.159, -2.1535) projected
  line L19 (-1.4565, -2.1535) -> (-1.9954, -2.1535) projected
  line L20 (0.7546, -1.4535) -> (4.8546, -1.4535) projected
  line L21 (0.7546, 0.1465) -> (0.7546, 0.4465) projected
  line L22 (0.7546, 0.4465) -> (0.5546, 0.4465) projected
  line L23 (0.5546, 0.4465) -> (0.5546, 0.4967) projected
  line L24 (-1.9954, 0.8465) -> (-1.2065, 0.8465) projected
  line L25 (-1.091, 0.8465) -> (-0.7065, 0.8465) projected
  line L26 (-0.591, 0.8465) -> (-0.2065, 0.8465) projected
  line L27 (0.5546, -1.8036) -> (0.5546, -1.7535) projected
  line L28 (0.5546, -1.7535) -> (0.7546, -1.7535) projected
  line L29 (0.7546, -1.7535) -> (0.7546, -1.4535) projected
  line L30 (4.8546, 0.1465) -> (0.7546, 0.1465) projected
  line L31 (0.7231, 0.8465) -> (0.9741, 0.8465) projected
  line L32 (1.563, 0.8465) -> (1.7697, 0.8465) projected
  line L33 (2.4029, 0.8465) -> (2.5653, 0.8465) projected
  line L34 (3.2428, 0.8465) -> (3.3609, 0.8465) projected
  line L35 (4.0827, 0.8465) -> (4.1565, 0.8465) projected
  line L36 (2.1675, -2.1535) -> (1.983, -2.1535) projected
  line L37 (1.3719, -2.1535) -> (1.1431, -2.1535) projected
  line L38 (0.5546, 0.4967) -> (-1.063, 0.4967) projected
  line L39 (4.9226, 0.8465) -> (4.9521, 0.8465) projected
  line L40 (5.7151, 0.78) -> (5.7532, 0.7767) projected
  line L41 (6.5056, 0.7108) -> (6.5543, 0.7066) projected
  line L42 (7.2962, 0.6417) -> (7.3555, 0.6365) projected
  line L43 (8.0868, 0.5725) -> (8.1566, 0.5664) projected
  line L44 (8.8362, 0.4456) -> (8.966, 0.3905) projected
  arc A2 (9.4152, -1.1196) -> (9.3418, 0.1298) centre (6.6796, -0.6535) ccw projected
  line L45 (9.4152, -1.1196) -> (5.6437, -1.6979) projected
  line L46 (5.3826, -1.738) -> (5.0794, -1.7845) projected
  line L47 (4.5773, -1.8615) -> (4.3223, -1.9006) projected
  line L48 (3.772, -1.985) -> (3.5652, -2.0167) projected
  line L49 (2.9667, -2.1084) -> (2.8081, -2.1328) projected
  line L50 (-0.4565, -2.1535) -> (-0.841, -2.1535) projected
  line L51 (-0.9565, -2.1535) -> (-1.341, -2.1535) projected
  line L52 (-1.063, -1.8036) -> (0.5546, -1.8036) projected
  point P0 (-2.0454, -0.6535)
  point P1 (0.3989, 3.4635)
  point P2 (7.9, 3.2589)
  point P3 (2.9371, 3.5)
  point P4 (0.038, 3.4961)
  point P5 (8.3992, 2.4114)
  point P6 (-0.0008, 0.0012)
  point P7 (3.1992, 0.225)
  point P8 (7.465, 0.5622)
  point P9 (6.6601, 0.4594)
  point P10 (5.8552, 0.3565)
  point P11 (5.0502, 0.2537)
  point P12 (4.8225, 0.3444)
  point P13 (7.4574, 0.5612)
  point P14 (6.6533, 0.4585)
  point P15 (5.8491, 0.3557)
  point P16 (5.0449, 0.253)
  point P17 (5.4232, 2.9217)
  point P18 (6.2232, 2.8587)
  point P19 (7.0232, 2.7958)
  point P20 (8.6232, 2.6699)
  point P21 (5.4232, 2.9217)
extrude "Extrusion23" [suppressed]
sketch "Sketch57" plane through (0.6191, -0.6495, -1.125) normal (0, 0, 1) x (1, 0, 0)
  point P0 (-0.6191, 0.6495)
sketch "Sketch58" plane through (2.1282, 0, 1.5) normal (0, -1, 0) x (1, 0, 0)
  line L0 (-0.0634, 0) -> (0.4723, 0) projected
  line L1 (-4.5095, -1.5) -> (12.087, -1.5) projected
  line L2 (-0.0426, -0.0738) -> (-0.0426, 0)
  line L3 (-0.0426, 0) -> (0, 0)
  line L4 (0.401, -0.1) -> (-0.059, -0.0557) projected
  line L5 (0.4723, 0) -> (0.401, -0.1) projected
  line L6 (-0.059, -0.0557) -> (-0.0634, 0) projected
  point P0 (-2.1282, -1.5)
revolve "Revolution9" [suppressed]
thread "Thread5" size "M1.6x0.35" class "6H" standard "ANSI Metric M Profile" length 3
sketch "Sketch59" plane through (2.0648, 0, 1.5) normal (0, -1, 0) x (1, 0, 0)
  line L0 (0, 0) -> (0.5357, 0) projected
  line L1 (0.0044, -0.0557) -> (0, 0) projected
  line L2 (0.4644, -0.1) -> (0.0044, -0.0557) projected
  line L3 (0.5357, 0) -> (0.4644, -0.1) projected
  line L4 (-4.4461, -1.5) -> (12.1504, -1.5) projected
  point P0 (-2.0648, -1.5)
revolve "Revolution10" [suppressed]
chamfer "Chamfer5" [suppressed]
chamfer "Chamfer6" distance 0.2 angle 45 1 edges at (3.5, 0, 0.675)
properties part number "3.5X13 Implant" material "Titanium"
